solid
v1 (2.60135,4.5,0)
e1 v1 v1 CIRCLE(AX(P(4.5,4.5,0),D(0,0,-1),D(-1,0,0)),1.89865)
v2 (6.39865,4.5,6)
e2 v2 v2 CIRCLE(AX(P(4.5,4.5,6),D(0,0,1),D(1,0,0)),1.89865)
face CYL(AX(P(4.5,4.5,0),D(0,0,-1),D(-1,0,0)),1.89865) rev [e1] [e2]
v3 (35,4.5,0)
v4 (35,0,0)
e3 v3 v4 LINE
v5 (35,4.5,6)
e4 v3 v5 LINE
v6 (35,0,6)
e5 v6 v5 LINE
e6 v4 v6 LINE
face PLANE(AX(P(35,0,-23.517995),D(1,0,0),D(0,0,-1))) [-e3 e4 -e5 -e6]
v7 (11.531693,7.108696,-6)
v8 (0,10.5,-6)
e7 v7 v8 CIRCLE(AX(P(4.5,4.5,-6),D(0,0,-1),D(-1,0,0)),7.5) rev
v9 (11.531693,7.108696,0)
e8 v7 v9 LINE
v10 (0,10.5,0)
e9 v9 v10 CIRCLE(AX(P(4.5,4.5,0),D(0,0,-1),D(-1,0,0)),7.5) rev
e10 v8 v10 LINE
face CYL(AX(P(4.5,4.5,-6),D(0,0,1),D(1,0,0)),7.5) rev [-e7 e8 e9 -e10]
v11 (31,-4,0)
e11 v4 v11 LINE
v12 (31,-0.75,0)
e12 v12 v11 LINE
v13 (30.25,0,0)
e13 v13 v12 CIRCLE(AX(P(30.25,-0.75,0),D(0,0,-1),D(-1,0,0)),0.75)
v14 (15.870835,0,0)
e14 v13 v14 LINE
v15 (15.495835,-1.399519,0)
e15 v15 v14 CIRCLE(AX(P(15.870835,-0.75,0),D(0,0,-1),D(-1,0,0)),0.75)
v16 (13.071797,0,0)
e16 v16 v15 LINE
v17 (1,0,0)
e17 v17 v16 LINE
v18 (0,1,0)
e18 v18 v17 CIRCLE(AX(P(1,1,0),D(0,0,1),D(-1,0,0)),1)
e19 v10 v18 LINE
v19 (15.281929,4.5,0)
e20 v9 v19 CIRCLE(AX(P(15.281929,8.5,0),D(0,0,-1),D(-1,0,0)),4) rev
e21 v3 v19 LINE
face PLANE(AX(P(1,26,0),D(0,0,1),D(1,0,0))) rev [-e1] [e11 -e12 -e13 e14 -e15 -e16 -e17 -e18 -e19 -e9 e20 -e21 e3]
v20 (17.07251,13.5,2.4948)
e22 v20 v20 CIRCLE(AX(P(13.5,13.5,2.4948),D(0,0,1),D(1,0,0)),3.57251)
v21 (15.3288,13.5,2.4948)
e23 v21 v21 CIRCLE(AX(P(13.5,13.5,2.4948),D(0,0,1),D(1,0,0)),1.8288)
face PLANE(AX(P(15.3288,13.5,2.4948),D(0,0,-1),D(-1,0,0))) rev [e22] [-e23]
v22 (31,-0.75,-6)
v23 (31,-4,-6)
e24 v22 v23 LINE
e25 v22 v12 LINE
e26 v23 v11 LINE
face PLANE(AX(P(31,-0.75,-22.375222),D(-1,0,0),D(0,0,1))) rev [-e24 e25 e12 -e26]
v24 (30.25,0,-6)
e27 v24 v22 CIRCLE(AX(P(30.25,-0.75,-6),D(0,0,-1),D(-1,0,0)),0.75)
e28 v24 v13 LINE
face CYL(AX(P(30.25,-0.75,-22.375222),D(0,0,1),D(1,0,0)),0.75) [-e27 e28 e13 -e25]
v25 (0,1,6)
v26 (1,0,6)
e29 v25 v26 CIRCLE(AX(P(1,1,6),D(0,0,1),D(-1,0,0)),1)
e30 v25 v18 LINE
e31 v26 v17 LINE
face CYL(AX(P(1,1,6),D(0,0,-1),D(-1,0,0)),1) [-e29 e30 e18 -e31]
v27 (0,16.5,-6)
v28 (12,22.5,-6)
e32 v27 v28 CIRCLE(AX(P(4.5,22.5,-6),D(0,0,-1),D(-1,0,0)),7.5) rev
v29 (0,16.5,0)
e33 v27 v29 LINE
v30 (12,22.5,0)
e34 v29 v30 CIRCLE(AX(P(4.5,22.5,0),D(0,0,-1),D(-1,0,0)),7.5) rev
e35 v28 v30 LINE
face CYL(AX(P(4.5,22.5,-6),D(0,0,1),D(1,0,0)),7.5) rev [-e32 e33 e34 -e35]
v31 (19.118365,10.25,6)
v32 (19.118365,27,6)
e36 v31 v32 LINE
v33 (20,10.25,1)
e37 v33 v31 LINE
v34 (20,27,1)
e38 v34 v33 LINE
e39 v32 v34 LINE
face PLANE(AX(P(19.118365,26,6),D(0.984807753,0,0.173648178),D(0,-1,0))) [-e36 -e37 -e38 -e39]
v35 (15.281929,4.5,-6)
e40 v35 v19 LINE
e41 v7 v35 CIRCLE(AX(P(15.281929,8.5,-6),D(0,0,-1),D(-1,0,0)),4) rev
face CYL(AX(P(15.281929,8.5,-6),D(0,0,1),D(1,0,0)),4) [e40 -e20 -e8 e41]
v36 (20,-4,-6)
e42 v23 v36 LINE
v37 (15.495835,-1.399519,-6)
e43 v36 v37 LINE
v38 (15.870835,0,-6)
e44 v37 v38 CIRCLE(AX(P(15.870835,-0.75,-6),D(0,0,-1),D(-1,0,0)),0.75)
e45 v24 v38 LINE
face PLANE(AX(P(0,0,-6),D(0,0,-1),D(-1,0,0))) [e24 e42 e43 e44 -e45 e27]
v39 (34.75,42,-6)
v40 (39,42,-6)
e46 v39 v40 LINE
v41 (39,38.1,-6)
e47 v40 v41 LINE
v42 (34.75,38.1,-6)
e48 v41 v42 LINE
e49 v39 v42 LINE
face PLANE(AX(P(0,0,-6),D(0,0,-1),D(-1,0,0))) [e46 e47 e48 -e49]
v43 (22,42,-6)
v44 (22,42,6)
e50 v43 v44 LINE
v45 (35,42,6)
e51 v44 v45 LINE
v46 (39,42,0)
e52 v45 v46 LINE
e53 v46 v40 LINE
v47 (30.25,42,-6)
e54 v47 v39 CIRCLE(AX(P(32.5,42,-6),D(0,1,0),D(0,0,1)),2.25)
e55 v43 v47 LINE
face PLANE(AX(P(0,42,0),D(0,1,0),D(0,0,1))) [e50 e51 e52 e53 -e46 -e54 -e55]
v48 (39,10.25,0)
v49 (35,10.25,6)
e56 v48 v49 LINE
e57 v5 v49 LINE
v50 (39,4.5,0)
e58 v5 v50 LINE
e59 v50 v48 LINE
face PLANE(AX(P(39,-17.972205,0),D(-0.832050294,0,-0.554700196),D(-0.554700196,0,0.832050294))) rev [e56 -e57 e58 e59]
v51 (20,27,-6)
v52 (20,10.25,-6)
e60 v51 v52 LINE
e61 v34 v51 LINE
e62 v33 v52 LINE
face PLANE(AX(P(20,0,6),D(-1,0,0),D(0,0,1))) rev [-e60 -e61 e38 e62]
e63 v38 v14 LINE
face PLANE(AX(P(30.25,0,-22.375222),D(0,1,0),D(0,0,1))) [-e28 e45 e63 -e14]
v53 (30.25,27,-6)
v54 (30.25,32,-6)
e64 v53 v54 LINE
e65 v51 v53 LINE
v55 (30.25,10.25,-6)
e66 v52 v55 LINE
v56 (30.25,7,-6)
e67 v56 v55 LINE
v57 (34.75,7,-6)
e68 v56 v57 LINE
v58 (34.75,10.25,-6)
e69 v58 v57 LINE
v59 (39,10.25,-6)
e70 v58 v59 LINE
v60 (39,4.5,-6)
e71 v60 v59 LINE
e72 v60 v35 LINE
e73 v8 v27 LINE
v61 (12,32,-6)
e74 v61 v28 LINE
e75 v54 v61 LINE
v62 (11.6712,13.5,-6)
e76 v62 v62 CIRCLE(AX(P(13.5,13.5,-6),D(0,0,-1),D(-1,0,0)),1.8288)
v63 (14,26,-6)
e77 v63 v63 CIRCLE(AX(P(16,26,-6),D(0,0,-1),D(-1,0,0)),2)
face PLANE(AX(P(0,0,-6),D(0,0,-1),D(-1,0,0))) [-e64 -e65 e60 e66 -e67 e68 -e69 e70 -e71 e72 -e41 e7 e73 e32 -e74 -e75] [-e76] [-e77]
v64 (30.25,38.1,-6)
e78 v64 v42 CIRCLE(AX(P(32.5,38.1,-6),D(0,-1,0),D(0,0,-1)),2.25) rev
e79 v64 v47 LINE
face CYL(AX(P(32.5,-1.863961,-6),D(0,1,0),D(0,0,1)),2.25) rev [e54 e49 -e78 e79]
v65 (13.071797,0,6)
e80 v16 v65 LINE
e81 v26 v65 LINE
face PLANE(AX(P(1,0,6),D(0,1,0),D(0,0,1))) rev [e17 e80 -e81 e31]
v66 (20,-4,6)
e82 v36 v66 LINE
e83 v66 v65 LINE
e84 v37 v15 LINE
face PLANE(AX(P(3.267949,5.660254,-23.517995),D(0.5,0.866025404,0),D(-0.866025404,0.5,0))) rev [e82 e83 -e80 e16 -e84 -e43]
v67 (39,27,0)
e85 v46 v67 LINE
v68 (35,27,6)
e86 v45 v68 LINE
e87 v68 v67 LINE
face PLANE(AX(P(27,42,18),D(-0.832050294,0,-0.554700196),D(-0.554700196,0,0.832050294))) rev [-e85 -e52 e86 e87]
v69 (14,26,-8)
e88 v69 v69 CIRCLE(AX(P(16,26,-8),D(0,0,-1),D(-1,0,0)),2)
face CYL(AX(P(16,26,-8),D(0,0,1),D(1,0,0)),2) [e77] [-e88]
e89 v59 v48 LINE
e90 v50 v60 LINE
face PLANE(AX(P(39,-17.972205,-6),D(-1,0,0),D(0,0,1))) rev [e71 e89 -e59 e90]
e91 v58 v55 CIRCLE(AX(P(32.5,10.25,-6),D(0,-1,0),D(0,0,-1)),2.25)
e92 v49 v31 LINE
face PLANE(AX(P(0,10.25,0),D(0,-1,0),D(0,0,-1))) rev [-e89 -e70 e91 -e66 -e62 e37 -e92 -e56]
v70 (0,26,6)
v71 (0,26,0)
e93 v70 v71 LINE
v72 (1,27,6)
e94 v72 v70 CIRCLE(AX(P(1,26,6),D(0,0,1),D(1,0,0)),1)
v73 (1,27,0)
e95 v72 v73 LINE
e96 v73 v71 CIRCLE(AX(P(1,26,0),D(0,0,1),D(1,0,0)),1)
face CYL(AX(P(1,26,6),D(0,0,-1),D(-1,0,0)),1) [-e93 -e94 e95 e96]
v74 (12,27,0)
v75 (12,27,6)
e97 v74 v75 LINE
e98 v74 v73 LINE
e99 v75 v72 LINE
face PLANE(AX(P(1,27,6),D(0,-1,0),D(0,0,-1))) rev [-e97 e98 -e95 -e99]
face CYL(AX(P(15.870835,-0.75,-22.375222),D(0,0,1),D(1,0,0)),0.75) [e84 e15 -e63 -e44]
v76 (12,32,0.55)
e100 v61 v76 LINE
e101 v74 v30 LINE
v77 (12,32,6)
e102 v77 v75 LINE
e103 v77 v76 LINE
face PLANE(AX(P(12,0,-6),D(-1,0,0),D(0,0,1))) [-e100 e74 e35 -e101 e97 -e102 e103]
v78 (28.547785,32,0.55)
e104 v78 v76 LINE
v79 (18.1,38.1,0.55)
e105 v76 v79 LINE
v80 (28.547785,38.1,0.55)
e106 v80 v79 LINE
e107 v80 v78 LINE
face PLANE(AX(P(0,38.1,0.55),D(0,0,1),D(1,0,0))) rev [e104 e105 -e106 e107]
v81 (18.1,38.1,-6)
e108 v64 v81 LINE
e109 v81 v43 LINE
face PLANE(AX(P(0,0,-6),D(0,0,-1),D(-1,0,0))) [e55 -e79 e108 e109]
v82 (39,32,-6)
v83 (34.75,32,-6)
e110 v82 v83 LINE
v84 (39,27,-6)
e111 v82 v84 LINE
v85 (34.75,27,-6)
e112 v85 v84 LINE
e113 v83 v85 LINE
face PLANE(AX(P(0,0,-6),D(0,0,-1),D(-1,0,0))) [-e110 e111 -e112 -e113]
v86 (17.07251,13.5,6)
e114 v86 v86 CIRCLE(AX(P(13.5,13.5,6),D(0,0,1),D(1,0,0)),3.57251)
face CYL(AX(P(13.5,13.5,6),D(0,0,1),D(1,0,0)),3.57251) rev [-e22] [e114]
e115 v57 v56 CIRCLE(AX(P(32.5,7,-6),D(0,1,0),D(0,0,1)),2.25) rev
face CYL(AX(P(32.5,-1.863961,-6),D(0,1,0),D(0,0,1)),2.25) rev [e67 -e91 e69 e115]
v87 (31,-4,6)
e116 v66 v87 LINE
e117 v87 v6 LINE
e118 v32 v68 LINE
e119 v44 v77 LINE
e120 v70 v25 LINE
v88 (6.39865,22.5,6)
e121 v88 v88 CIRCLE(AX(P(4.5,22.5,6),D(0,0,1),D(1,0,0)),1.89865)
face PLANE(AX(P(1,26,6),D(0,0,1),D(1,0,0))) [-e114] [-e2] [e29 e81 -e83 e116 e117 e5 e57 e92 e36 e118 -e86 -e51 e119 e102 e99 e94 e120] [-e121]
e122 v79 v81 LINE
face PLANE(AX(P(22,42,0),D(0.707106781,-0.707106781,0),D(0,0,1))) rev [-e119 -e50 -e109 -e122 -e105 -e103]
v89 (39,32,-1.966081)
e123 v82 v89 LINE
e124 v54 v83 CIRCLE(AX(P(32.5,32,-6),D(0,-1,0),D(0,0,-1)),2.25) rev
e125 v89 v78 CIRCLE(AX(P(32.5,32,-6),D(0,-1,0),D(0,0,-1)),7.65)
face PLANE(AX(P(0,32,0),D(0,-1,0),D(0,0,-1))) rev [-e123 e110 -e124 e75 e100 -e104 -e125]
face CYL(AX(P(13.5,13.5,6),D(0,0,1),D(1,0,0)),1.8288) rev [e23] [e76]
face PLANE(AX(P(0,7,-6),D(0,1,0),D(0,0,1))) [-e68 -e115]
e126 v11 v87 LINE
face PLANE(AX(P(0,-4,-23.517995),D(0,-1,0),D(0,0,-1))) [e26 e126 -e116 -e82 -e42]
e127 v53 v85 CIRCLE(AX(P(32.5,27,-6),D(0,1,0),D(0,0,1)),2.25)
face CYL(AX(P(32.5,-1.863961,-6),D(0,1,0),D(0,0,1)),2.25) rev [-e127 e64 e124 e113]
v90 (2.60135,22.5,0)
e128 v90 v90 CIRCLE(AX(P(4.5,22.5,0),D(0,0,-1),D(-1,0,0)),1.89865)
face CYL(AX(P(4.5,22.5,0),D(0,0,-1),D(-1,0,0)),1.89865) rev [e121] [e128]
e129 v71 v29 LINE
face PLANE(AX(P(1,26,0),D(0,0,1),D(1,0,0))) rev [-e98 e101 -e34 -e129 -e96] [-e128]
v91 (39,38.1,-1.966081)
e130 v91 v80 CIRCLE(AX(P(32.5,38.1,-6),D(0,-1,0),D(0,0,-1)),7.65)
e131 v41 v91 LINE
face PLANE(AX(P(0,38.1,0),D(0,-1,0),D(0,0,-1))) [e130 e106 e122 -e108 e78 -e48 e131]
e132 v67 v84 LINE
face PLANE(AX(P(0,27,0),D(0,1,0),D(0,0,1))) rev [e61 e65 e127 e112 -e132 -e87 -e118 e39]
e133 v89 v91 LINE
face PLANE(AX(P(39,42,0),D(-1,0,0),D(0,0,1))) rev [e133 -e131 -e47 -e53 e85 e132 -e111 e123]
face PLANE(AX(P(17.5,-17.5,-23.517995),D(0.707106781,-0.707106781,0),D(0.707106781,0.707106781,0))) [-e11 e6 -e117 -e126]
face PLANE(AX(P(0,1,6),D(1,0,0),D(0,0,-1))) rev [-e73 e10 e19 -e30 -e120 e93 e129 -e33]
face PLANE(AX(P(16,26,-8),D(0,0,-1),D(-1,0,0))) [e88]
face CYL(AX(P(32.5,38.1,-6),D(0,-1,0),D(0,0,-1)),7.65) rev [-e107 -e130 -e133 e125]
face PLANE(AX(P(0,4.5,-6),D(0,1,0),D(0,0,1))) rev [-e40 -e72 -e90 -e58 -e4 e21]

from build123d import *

# Parameters (mm, degrees)
BOSS_EXTRUDE1_DEPTH                            = 6
BOSS_EXTRUDE3_DEPTH                            = 6
CBORE_FOR_6_SOCKET_HEAD_CAP_SCREW1_D           = 3.6576
CBORE_FOR_6_SOCKET_HEAD_CAP_SCREW1_CBORE_D     = 7.14502
CBORE_FOR_6_SOCKET_HEAD_CAP_SCREW1_CBORE_DEPTH = 3.5052
F_6_CLEARANCE_HOLE1_D                          = 3.7973
F_6_CLEARANCE_HOLE1_DEPTH                      = 17.47
F_6_CLEARANCE_HOLE1_TIP                        = 1.140824014
BOSS_EXTRUDE5_DEPTH                            = 15
BOSS_EXTRUDE6_DEPTH                            = 5.75
CUT_EXTRUDE1_START                             = -20
SKETCH11_5_R                                   = 2.25
CUT_EXTRUDE1_DEPTH                             = 35
CUT_EXTRUDE2_DEPTH                             = 6.1
CHAMFER2_SIZE                                  = 10
SKETCH26_R                                     = 2
BOSS_EXTRUDE10_DEPTH                           = 2
CHAMFER3_SIZE                                  = 5
CHAMFER3_SIZE2                                 = 0.881634904
BOSS_EXTRUDE7_DEPTH                            = 6
BOSS_EXTRUDE9_DEPTH                            = 6


with BuildPart() as part:
    # Sketch2 → Boss-Extrude1 (new body)
    with BuildSketch(Plane.XY):
        with BuildLine():
            Line((1, 0), (20, 0))
            Line((20, 0), (20, 27))
            Line((20, 27), (1, 27))
            ThreePointArc((1, 27), (0.292893219, 26.707106781), (0, 26))
            Line((0, 26), (0, 1))
            ThreePointArc((0, 1), (0.292893219, 0.292893219), (1, 0))
        make_face()
    extrude(amount=BOSS_EXTRUDE1_DEPTH)

    # Sketch3 → Boss-Extrude3 (add)
    with BuildSketch(Plane.XY):
        with BuildLine():
            ThreePointArc((0, 10.5), (6.616034902, 11.695303767), (11.531693039, 7.108695652))
            ThreePointArc((11.531693039, 7.108695652), (12.997768364, 5.216311724), (15.281929326, 4.5))
            Line((15.281929326, 4.5), (20, 4.5))
            Line((20, 4.5), (20, 27))
            Line((20, 27), (12, 27))
            Line((12, 27), (12, 22.5))
            ThreePointArc((12, 22.5), (7.854101966, 15.791796068), (0, 16.5))
            Line((0, 16.5), (0, 10.5))
        make_face()
    extrude(amount=-BOSS_EXTRUDE3_DEPTH)

    # CBORE for #6 Socket Head Cap Screw1 (through all)
    with Locations(Plane.XY.offset(6)):
        with Locations((13.5, 13.5)):
            CounterBoreHole(CBORE_FOR_6_SOCKET_HEAD_CAP_SCREW1_D / 2, CBORE_FOR_6_SOCKET_HEAD_CAP_SCREW1_CBORE_D / 2, CBORE_FOR_6_SOCKET_HEAD_CAP_SCREW1_CBORE_DEPTH)

    # #6 Clearance Hole1
    with Locations(Plane(origin=(0, 0, 0), x_dir=(-1, 0, 0), z_dir=(0, 0, -1))):
        with Locations((-4.5, 22.5), (-4.5, 4.5)):
            Hole(F_6_CLEARANCE_HOLE1_D / 2, depth=F_6_CLEARANCE_HOLE1_DEPTH)
            with Locations((0, 0, -(F_6_CLEARANCE_HOLE1_DEPTH + F_6_CLEARANCE_HOLE1_TIP / 2))):  # 118° drill point
                Cone(0, F_6_CLEARANCE_HOLE1_D / 2, F_6_CLEARANCE_HOLE1_TIP, mode=Mode.SUBTRACT)

    # Sketch11 → Boss-Extrude5 (add)
    with BuildSketch(Plane(origin=(0, 27, 0), x_dir=(1, 0, 0), z_dir=(0, 1, 0))):
        Polygon((12, 6), (12, -6), (35, -6), (39, 0), (39, 6), align=None)
    extrude(amount=BOSS_EXTRUDE5_DEPTH)

    # Sketch13 → Boss-Extrude6 (add)
    with BuildSketch(Plane(origin=(0, 10.25, 0), x_dir=(-1, 0, 0), z_dir=(0, -1, 0))):
        Polygon((-20, 6), (-39, 6), (-39, 0), (-35, -6), (-20, -6), align=None)
    extrude(amount=BOSS_EXTRUDE6_DEPTH)

    # Sketch11<5> → Cut-Extrude1 (cut)
    with BuildSketch(Plane(origin=(0, 27, 0), x_dir=(1, 0, 0), z_dir=(0, 1, 0)).offset(CUT_EXTRUDE1_START)):
        with Locations((32.5, 6)):
            Circle(SKETCH11_5_R)
    extrude(amount=CUT_EXTRUDE1_DEPTH, mode=Mode.SUBTRACT)

    # Sketch14 → Cut-Extrude2 (cut)
    with BuildSketch(Plane(origin=(0, 32, 0), x_dir=(-1, 0, 0), z_dir=(0, -1, 0))):
        with BuildLine():
            Line((-29.85, 12.55), (-29.85, -0.55))
            Line((-29.85, -0.55), (-28.547785431, -0.55))
            ThreePointArc((-28.547785431, -0.55), (-25.8382832, 2.239145141), (-24.85, 6))
            ThreePointArc((-24.85, 6), (-25.8382832, 9.760854859), (-28.547785431, 12.55))
            Line((-28.547785431, 12.55), (-29.85, 12.55))
        make_face()
        with BuildLine():
            Line((-28.547785431, -0.55), (-29.85, -0.55))
            Line((-29.85, -0.55), (-29.85, 12.55))
            Line((-29.85, 12.55), (-28.547785431, 12.55))
            ThreePointArc((-28.547785431, 12.55), (-40.15, 6), (-28.547785431, -0.55))
        make_face()
        with BuildLine():
            ThreePointArc((-24.85, 6), (-25.8382832, 2.239145141), (-28.547785431, -0.55))
            Line((-28.547785431, -0.55), (-24.85, -0.55))
            Line((-24.85, -0.55), (-24.85, 6))
        make_face()
        Polygon((-24.85, 6), (-24.85, -0.55), (-9.85, -0.55), (-9.85, 12.55), (-24.85, 12.55), align=None)
        with BuildLine():
            Line((-24.85, 12.55), (-28.547785431, 12.55))
            ThreePointArc((-28.547785431, 12.55), (-25.8382832, 9.760854859), (-24.85, 6))
            Line((-24.85, 6), (-24.85, 12.55))
        make_face()
    extrude(amount=-CUT_EXTRUDE2_DEPTH, mode=Mode.SUBTRACT)

    # Chamfer2
    chamfer2_edges = [part.edges().sort_by_distance(p)[0] for p in [
        (12, 42, 0),
    ]]
    chamfer(chamfer2_edges, length=CHAMFER2_SIZE)

    # Sketch26 → Boss-Extrude10 (add)
    with BuildSketch(Plane(origin=(0, 0, -6), x_dir=(-1, 0, 0), z_dir=(0, 0, -1))):
        with Locations((-16, 26)):
            Circle(SKETCH26_R)
    extrude(amount=BOSS_EXTRUDE10_DEPTH)

    # Chamfer3
    chamfer3_edges = [part.edges().sort_by_distance(p)[0] for p in [
        (20, 18.625, 6),
    ]]
    chamfer3_side = [part.faces().sort_by_distance(p)[0] for p in [
        (20, 18.625, 0),
    ]]
    chamfer(chamfer3_edges, length=CHAMFER3_SIZE, length2=CHAMFER3_SIZE2, reference=chamfer3_side[0])

    # Sketch15 → Boss-Extrude7 (add)
    with BuildSketch(Plane.XY.offset(6)):
        Polygon((20, 4.5), (20, 0), (13.07179677, 0), (20, -4), (31, -4), (35, 0), (35, 4.5), align=None)
    extrude(amount=-BOSS_EXTRUDE7_DEPTH)

    # Sketch17 → Boss-Extrude9 (add)
    with BuildSketch(Plane(origin=(0, 0, 0), x_dir=(-1, 0, 0), z_dir=(0, 0, -1))):
        with BuildLine():
            Line((-30.25, 0), (-15.870834875, 0))
            ThreePointArc((-15.870834875, 0), (-15.146390506, -0.555885716), (-15.495834875, -1.399519053))
            Line((-15.495834875, -1.399519053), (-20, -4))
            Line((-20, -4), (-31, -4))
            Line((-31, -4), (-31, -0.75))
            ThreePointArc((-31, -0.75), (-30.780330086, -0.219669914), (-30.25, 0))
        make_face()
    extrude(amount=BOSS_EXTRUDE9_DEPTH)


solid = part.part
